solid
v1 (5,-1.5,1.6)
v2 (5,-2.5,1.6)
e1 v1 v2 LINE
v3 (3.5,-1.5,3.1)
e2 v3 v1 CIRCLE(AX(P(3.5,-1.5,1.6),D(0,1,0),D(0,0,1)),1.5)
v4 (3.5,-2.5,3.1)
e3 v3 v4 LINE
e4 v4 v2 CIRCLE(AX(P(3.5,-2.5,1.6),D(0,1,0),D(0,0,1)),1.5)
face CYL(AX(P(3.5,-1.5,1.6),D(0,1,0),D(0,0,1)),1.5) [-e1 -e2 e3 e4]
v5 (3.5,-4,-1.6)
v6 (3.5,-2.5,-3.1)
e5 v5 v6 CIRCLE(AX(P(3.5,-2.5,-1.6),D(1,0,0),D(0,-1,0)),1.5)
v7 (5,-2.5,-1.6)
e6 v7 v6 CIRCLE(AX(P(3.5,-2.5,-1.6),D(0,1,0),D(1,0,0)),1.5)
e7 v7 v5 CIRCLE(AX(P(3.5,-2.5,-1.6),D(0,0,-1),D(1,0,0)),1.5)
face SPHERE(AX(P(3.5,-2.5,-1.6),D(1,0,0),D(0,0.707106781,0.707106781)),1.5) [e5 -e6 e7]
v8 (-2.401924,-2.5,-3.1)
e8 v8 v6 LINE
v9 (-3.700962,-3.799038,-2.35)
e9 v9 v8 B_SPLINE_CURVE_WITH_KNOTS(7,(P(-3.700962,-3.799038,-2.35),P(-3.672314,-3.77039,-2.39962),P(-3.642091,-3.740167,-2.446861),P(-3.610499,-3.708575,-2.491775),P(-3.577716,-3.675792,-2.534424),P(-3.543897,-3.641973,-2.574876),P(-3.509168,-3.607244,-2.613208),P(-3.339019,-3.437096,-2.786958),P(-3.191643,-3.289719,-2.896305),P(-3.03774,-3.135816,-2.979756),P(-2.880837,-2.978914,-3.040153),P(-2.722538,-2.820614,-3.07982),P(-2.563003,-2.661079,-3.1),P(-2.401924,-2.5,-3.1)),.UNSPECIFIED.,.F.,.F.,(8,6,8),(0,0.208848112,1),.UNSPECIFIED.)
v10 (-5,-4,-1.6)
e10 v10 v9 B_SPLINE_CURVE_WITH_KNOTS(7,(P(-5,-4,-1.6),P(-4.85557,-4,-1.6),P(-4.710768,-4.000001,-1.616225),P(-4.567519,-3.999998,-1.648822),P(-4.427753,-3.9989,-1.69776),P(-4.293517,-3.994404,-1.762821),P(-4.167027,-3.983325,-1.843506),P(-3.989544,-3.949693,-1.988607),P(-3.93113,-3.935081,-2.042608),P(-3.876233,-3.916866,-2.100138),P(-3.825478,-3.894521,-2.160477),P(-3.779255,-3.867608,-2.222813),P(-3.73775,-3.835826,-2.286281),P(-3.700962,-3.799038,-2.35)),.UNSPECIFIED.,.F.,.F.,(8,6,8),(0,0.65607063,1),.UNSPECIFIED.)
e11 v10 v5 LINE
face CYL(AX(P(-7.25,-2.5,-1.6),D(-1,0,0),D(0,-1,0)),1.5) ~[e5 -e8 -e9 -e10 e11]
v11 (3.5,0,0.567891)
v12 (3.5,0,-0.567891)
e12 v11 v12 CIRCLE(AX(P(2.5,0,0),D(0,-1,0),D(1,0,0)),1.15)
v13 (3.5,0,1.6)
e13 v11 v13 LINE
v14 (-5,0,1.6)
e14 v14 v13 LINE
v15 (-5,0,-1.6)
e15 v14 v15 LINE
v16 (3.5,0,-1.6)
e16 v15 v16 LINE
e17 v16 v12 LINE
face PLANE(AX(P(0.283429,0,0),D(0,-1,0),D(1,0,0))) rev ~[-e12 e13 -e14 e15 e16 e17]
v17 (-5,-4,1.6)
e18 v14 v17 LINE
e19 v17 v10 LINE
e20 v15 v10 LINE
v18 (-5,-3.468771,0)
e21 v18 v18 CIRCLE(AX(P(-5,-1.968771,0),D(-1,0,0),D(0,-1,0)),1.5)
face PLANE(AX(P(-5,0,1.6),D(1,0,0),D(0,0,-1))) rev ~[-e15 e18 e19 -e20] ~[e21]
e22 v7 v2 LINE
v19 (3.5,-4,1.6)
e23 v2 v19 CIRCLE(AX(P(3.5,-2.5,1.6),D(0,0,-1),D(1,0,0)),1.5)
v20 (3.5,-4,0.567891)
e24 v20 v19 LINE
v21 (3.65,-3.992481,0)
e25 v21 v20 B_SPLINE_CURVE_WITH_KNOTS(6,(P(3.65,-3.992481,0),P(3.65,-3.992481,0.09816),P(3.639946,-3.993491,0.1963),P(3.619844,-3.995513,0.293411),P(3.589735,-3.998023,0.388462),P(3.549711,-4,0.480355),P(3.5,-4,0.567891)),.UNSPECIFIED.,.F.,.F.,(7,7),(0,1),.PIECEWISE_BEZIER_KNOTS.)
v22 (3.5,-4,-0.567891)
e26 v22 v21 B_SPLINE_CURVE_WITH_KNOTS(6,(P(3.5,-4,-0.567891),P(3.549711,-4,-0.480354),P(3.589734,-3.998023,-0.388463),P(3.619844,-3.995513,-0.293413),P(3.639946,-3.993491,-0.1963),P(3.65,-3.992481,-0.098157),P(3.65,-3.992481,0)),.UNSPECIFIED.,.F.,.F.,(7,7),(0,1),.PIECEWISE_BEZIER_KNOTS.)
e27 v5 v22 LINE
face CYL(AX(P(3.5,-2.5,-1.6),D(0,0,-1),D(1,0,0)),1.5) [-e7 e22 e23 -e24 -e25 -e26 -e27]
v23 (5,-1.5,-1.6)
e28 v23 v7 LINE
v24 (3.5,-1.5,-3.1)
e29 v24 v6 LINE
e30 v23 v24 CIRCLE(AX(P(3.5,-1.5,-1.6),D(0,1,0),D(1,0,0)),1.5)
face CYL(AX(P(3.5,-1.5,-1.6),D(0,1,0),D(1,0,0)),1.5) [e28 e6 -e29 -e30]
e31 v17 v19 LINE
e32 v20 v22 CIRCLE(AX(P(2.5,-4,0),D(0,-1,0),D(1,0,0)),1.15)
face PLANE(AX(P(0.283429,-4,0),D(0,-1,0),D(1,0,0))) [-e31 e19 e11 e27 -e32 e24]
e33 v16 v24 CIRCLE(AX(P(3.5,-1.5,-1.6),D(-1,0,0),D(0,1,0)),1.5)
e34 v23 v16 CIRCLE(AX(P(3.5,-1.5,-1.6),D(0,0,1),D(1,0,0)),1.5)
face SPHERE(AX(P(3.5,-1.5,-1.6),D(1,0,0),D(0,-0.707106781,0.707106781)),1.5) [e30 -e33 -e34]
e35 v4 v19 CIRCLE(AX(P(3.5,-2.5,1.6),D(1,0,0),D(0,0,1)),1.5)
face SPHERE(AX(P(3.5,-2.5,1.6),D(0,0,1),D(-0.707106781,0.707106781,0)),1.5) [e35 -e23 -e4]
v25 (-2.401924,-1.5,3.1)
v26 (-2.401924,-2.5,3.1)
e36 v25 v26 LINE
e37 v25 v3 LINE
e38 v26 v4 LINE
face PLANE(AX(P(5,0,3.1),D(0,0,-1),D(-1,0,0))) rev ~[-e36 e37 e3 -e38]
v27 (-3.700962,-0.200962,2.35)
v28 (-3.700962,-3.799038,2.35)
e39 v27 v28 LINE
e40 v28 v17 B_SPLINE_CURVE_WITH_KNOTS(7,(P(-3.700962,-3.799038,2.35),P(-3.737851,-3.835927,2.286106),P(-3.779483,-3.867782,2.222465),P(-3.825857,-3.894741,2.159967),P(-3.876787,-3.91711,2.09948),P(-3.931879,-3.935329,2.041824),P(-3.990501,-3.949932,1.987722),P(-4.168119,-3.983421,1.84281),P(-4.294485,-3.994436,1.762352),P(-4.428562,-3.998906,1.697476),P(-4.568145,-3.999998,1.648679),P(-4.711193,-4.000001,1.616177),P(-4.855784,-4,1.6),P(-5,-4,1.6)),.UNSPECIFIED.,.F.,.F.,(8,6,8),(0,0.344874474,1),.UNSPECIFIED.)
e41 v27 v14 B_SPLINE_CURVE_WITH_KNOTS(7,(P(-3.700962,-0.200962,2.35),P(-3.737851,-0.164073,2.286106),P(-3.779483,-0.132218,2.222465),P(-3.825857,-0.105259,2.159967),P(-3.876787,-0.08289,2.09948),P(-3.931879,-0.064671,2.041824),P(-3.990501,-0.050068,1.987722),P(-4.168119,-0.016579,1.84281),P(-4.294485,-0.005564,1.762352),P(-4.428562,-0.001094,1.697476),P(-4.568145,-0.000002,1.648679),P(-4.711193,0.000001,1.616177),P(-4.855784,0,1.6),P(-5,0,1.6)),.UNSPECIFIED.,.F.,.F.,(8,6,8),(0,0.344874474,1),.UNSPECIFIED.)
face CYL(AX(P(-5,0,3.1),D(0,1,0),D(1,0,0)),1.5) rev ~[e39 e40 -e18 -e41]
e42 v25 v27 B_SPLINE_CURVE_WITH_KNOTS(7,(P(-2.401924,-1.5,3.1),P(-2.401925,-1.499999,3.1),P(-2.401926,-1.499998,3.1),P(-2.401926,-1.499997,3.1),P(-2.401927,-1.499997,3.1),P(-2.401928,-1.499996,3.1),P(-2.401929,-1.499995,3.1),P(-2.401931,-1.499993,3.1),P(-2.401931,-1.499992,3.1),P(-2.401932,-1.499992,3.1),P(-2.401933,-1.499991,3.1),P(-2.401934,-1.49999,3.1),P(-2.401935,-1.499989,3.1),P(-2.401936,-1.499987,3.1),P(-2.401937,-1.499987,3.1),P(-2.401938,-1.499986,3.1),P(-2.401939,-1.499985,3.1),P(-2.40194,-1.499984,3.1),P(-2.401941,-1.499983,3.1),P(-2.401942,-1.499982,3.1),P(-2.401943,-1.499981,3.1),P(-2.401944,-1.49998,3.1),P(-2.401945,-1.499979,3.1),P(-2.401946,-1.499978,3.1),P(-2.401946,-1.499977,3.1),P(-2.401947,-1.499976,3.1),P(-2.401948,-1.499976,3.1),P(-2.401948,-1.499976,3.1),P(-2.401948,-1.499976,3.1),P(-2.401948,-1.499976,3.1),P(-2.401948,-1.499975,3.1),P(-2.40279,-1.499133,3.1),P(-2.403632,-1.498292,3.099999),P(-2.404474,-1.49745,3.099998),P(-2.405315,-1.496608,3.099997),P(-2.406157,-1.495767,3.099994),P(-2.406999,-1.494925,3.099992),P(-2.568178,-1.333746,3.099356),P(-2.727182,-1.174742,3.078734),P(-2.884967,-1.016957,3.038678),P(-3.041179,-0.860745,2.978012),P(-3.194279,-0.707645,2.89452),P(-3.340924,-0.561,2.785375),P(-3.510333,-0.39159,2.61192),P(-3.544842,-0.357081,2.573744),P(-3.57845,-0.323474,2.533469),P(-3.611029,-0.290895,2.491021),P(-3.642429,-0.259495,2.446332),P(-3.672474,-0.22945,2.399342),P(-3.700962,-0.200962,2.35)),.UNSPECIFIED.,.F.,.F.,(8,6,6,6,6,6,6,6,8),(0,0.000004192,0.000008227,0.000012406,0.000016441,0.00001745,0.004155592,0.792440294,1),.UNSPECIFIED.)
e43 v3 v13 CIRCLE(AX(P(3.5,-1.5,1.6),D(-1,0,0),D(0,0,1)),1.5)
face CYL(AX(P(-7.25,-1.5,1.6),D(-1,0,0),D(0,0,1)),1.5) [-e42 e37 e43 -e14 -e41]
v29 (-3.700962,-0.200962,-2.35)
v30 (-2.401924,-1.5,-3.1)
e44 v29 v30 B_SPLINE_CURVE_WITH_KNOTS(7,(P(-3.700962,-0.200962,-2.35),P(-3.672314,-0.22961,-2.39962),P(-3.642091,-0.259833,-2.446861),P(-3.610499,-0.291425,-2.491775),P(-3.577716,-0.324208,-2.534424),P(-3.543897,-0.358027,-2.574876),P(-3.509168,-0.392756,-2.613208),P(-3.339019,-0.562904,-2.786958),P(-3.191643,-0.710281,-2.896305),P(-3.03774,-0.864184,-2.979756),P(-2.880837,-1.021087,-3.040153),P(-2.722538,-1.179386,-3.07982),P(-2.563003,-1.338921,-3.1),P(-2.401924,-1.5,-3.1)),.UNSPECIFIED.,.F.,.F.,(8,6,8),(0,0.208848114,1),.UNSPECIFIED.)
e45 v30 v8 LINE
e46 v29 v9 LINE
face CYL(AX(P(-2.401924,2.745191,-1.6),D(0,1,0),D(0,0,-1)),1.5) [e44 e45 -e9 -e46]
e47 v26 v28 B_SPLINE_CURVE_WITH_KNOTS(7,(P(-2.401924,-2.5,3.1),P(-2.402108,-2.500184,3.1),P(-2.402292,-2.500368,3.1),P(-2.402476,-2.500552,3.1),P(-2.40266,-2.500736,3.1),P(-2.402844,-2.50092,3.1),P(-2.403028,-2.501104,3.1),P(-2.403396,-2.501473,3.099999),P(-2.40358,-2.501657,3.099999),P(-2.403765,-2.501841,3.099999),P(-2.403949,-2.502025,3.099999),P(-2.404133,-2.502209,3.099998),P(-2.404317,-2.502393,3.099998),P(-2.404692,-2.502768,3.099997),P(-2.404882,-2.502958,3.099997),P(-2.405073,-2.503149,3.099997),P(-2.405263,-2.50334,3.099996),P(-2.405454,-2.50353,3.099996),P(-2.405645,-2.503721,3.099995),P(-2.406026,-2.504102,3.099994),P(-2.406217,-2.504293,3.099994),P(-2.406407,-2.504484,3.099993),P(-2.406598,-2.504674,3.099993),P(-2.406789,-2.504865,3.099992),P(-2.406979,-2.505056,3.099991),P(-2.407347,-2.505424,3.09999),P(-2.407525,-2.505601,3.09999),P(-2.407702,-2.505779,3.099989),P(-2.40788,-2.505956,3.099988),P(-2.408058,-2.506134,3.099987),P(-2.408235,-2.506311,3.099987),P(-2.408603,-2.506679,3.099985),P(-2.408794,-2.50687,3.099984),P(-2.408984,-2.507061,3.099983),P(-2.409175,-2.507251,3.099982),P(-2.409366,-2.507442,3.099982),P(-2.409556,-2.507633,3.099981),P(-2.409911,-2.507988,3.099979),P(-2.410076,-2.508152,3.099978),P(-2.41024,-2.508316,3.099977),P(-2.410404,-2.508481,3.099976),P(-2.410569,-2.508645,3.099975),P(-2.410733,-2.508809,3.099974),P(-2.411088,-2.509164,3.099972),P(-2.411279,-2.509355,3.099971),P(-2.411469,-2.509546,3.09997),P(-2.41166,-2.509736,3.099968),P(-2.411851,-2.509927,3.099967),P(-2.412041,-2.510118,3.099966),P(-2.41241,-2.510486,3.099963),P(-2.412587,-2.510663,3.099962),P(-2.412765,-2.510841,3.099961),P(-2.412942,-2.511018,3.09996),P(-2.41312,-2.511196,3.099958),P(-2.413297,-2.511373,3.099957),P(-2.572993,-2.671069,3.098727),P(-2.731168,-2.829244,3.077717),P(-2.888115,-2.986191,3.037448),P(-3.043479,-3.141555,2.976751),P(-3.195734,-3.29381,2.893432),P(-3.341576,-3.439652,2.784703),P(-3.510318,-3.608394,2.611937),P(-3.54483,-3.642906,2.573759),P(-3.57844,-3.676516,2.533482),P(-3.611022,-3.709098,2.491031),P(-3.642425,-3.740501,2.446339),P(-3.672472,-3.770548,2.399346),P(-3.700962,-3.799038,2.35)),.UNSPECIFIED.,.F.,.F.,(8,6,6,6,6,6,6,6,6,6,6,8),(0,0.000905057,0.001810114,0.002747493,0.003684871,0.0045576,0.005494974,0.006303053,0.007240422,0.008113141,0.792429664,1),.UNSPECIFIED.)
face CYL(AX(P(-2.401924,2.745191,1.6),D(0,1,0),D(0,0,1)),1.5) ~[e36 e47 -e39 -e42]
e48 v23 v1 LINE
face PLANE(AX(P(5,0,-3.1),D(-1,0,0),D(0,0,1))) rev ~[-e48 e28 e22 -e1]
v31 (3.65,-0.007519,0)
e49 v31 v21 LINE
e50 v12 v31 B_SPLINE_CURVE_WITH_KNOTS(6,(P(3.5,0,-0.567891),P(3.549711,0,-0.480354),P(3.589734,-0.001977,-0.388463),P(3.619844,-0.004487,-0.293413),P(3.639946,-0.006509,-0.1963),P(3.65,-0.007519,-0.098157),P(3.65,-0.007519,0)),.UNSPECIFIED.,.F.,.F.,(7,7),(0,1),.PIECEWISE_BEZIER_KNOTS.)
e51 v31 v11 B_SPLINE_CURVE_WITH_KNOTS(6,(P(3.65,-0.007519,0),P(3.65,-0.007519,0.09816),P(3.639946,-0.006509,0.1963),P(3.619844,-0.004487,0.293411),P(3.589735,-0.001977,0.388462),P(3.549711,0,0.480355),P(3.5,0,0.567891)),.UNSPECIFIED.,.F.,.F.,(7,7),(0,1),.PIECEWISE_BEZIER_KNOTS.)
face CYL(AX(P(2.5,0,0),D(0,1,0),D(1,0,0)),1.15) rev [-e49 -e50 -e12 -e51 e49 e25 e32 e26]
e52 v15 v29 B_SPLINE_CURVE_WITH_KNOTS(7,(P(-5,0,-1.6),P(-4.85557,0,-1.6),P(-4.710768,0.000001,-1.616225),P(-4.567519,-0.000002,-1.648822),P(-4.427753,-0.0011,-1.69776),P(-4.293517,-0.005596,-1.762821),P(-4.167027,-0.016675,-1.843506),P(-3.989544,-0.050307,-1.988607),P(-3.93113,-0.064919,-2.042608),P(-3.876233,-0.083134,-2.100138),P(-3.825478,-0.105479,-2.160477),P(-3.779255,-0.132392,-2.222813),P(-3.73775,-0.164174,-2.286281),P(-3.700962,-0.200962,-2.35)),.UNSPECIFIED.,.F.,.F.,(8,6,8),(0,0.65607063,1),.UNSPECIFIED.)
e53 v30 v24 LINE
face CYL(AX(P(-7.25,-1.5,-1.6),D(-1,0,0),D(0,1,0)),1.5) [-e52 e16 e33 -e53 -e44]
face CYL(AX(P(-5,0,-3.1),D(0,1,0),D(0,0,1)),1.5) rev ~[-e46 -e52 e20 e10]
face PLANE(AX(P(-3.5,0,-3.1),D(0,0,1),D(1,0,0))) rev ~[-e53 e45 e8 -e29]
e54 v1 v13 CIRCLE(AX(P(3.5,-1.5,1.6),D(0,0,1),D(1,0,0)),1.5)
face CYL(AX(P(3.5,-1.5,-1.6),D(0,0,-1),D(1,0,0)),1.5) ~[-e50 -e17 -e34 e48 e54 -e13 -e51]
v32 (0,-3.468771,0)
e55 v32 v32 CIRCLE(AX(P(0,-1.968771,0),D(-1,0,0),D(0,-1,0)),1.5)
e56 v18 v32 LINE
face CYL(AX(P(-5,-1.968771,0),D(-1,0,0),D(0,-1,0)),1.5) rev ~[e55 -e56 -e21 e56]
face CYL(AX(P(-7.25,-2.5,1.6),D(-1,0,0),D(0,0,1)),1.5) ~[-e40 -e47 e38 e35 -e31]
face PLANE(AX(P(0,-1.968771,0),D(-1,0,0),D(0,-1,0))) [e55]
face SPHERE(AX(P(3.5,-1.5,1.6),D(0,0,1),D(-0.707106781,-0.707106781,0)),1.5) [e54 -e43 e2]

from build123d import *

# Parameters (mm, degrees)
F0_R         = 1.15
F1_DEPTH     = 4
F2_R         = 1.5
F3_DEPTH     = 5
F4_T1_DEPTH  = 9.4903810568
F4_T3_DEPTH  = 1
F4_T5_DEPTH  = 10.75
F4_T7_DEPTH  = 3.2
F4_S11_W     = 1.5
F4_S11_H     = 1.5
F4_T12_DEPTH = 1.5
F4_S17_W     = 1.5
F4_S17_H     = 1.5
F4_T18_DEPTH = 1.5
F4_S23_W     = 1.5
F4_S23_H     = 1.5
F4_T24_DEPTH = 1.5
F4_S29_W     = 1.5
F4_S29_H     = 1.5
F4_T30_DEPTH = 1.5


# Not quite as in the source:
# - a fillet or chamfer that OpenCascade refuses, or shapes differently, is made with other operations: its cross-section is extruded or revolved along the edge and cut away or added


with BuildPart() as f1:
    # F0 (on Front) → F1 (new body)
    with BuildSketch(Plane.XZ):
        with BuildLine():
            Line((5, 3.1), (-3.5, 3.1))
            ThreePointArc((-3.5, 3.1), (-3.9393398282, 2.0393398282), (-5, 1.6))
            Line((-5, 1.6), (-5, -1.6))
            ThreePointArc((-5, -1.6), (-3.9393398282, -2.0393398282), (-3.5, -3.1))
            Line((-3.5, -3.1), (5, -3.1))
            Line((5, -3.1), (5, 3.1))
        make_face()
        with Locations((2.5, 0)):
            Circle(F0_R, mode=Mode.SUBTRACT)
    extrude(amount=F1_DEPTH)

    # F2 (on face) → F3 (cut)
    with BuildSketch(Plane(origin=(-5, 0, 0), x_dir=(0, -1, 0), z_dir=(-1, 0, 0))):
        with Locations((1.9687709864, 0)):
            Circle(F2_R)
    extrude(amount=-F3_DEPTH, mode=Mode.SUBTRACT)

    # F4: fillet of radius 1.5 on 10 edges, made by hand

    # F4_s2 → F4_t1 (cut)
    with BuildSketch(Plane.XZ.offset(-2.7451905284)):
        with BuildLine():
            ThreePointArc((-2.4019237886, 3.1), (-3.1519237886, 2.8990381057), (-3.7009618943, 2.35))
            ThreePointArc((-3.7009618943, 2.35), (-3.5511112606, 2.7117714323), (-3.5, 3.1))
            Line((-3.5, 3.1), (-2.4019237886, 3.1))
        make_face()
        with BuildLine():
            ThreePointArc((-2.4019237886, -3.1), (-3.1519237886, -2.8990381057), (-3.7009618943, -2.35))
            ThreePointArc((-3.7009618943, -2.35), (-3.5511112606, -2.7117714323), (-3.5, -3.1))
            Line((-3.5, -3.1), (-2.4019237886, -3.1))
        make_face()
    extrude(amount=F4_T1_DEPTH, mode=Mode.SUBTRACT)

    # F4_s4 → F4_t3 (cut)
    with BuildSketch(Plane.XZ.offset(1.5)):
        with BuildLine():
            ThreePointArc((3.5, 3.1), (4.5606601718, 2.6606601718), (5, 1.6))
            Line((5, 1.6), (5, 3.1))
            Line((5, 3.1), (3.5, 3.1))
        make_face()
        with BuildLine():
            ThreePointArc((5, -1.6), (4.5606601718, -2.6606601718), (3.5, -3.1))
            Line((3.5, -3.1), (5, -3.1))
            Line((5, -3.1), (5, -1.6))
        make_face()
    extrude(amount=F4_T3_DEPTH, mode=Mode.SUBTRACT)

    # F4_s6 → F4_t5 (cut)
    with BuildSketch(Plane.YZ.offset(-7.25)):
        with BuildLine():
            ThreePointArc((-2.5, 3.1), (-3.5606601718, 2.6606601718), (-4, 1.6))
            Line((-4, 1.6), (-4, 3.1))
            Line((-4, 3.1), (-2.5, 3.1))
        make_face()
        with BuildLine():
            ThreePointArc((-1.5, 3.1), (-0.4393398282, 2.6606601718), (0, 1.6))
            Line((0, 1.6), (0, 3.1))
            Line((0, 3.1), (-1.5, 3.1))
        make_face()
        with BuildLine():
            ThreePointArc((0, -1.6), (-0.4393398282, -2.6606601718), (-1.5, -3.1))
            Line((-1.5, -3.1), (0, -3.1))
            Line((0, -3.1), (0, -1.6))
        make_face()
        with BuildLine():
            ThreePointArc((-4, -1.6), (-3.5606601718, -2.6606601718), (-2.5, -3.1))
            Line((-2.5, -3.1), (-4, -3.1))
            Line((-4, -3.1), (-4, -1.6))
        make_face()
    extrude(amount=F4_T5_DEPTH, mode=Mode.SUBTRACT)

    # F4_s8 → F4_t7 (cut)
    with BuildSketch(Plane.XY.offset(-1.6)):
        with BuildLine():
            ThreePointArc((5, -1.5), (4.5606601718, -0.4393398282), (3.5, 0))
            Line((3.5, 0), (5, 0))
            Line((5, 0), (5, -1.5))
        make_face()
        with BuildLine():
            ThreePointArc((5, -2.5), (4.5606601718, -3.5606601718), (3.5, -4))
            Line((3.5, -4), (5, -4))
            Line((5, -4), (5, -2.5))
        make_face()
    extrude(amount=F4_T7_DEPTH, mode=Mode.SUBTRACT)


with BuildPart() as f4_tool10:
    # F4_s11 → F4_t12 (new body)
    with BuildSketch(Plane.XY.offset(1.6)):
        with Locations((4.25, -0.75)):
            Rectangle(F4_S11_W, F4_S11_H)
    extrude(amount=F4_T12_DEPTH)

    # F4_s13 → F4_t14 (revolve, cut)
    with BuildSketch(Plane(origin=(3.5, -1.5, 1.6), x_dir=(-0.7071067812, -0.7071067812, 0), z_dir=(-0.7071067812, 0.7071067812, 0))):
        with BuildLine():
            ThreePointArc((0, -1.5), (1.5, 0), (0, 1.5))
            Line((0, 1.5), (0, -1.5))
        make_face()
    revolve(axis=Axis((3.5, -1.5, 1.6), (0, 0, 1)), mode=Mode.SUBTRACT)


with BuildPart() as f1_1:
    add(f1.part)

    # F4_t9: cut F4_tool10
    add(f4_tool10.part, mode=Mode.SUBTRACT)


with BuildPart() as f4_tool16:
    # F4_s17 → F4_t18 (new body)
    with BuildSketch(Plane.XY.offset(1.6)):
        with Locations((4.25, -3.25)):
            Rectangle(F4_S17_W, F4_S17_H)
    extrude(amount=F4_T18_DEPTH)

    # F4_s19 → F4_t20 (revolve, cut)
    with BuildSketch(Plane(origin=(3.5, -2.5, 1.6), x_dir=(-0.7071067812, 0.7071067812, 0), z_dir=(0.7071067812, 0.7071067812, 0))):
        with BuildLine():
            ThreePointArc((0, -1.5), (1.5, 0), (0, 1.5))
            Line((0, 1.5), (0, -1.5))
        make_face()
    revolve(axis=Axis((3.5, -2.5, 1.6), (0, 0, 1)), mode=Mode.SUBTRACT)


with BuildPart() as f1_2:
    add(f1_1.part)

    # F4_t15: cut F4_tool16
    add(f4_tool16.part, mode=Mode.SUBTRACT)


with BuildPart() as f4_tool22:
    # F4_s23 → F4_t24 (new body)
    with BuildSketch(Plane.YZ.offset(3.5)):
        with Locations((-0.75, -2.35)):
            Rectangle(F4_S23_W, F4_S23_H)
    extrude(amount=F4_T24_DEPTH)

    # F4_s25 → F4_t26 (revolve, cut)
    with BuildSketch(Plane(origin=(3.5, -1.5, -1.6), x_dir=(0, -0.7071067812, 0.7071067812), z_dir=(0, 0.7071067812, 0.7071067812))):
        with BuildLine():
            ThreePointArc((0, -1.5), (1.5, 0), (0, 1.5))
            Line((0, 1.5), (0, -1.5))
        make_face()
    revolve(axis=Axis((3.5, -1.5, -1.6), (1, 0, 0)), mode=Mode.SUBTRACT)


with BuildPart() as f1_3:
    add(f1_2.part)

    # F4_t21: cut F4_tool22
    add(f4_tool22.part, mode=Mode.SUBTRACT)


with BuildPart() as f4_tool28:
    # F4_s29 → F4_t30 (new body)
    with BuildSketch(Plane.YZ.offset(3.5)):
        with Locations((-3.25, -2.35)):
            Rectangle(F4_S29_W, F4_S29_H)
    extrude(amount=F4_T30_DEPTH)

    # F4_s31 → F4_t32 (revolve, cut)
    with BuildSketch(Plane(origin=(3.5, -2.5, -1.6), x_dir=(0, 0.7071067812, 0.7071067812), z_dir=(0, 0.7071067812, -0.7071067812))):
        with BuildLine():
            ThreePointArc((0, -1.5), (1.5, 0), (0, 1.5))
            Line((0, 1.5), (0, -1.5))
        make_face()
    revolve(axis=Axis((3.5, -2.5, -1.6), (1, 0, 0)), mode=Mode.SUBTRACT)


with BuildPart() as f1_4:
    add(f1_3.part)

    # F4_t27: cut F4_tool28
    add(f4_tool28.part, mode=Mode.SUBTRACT)


solid = f1_4.part
